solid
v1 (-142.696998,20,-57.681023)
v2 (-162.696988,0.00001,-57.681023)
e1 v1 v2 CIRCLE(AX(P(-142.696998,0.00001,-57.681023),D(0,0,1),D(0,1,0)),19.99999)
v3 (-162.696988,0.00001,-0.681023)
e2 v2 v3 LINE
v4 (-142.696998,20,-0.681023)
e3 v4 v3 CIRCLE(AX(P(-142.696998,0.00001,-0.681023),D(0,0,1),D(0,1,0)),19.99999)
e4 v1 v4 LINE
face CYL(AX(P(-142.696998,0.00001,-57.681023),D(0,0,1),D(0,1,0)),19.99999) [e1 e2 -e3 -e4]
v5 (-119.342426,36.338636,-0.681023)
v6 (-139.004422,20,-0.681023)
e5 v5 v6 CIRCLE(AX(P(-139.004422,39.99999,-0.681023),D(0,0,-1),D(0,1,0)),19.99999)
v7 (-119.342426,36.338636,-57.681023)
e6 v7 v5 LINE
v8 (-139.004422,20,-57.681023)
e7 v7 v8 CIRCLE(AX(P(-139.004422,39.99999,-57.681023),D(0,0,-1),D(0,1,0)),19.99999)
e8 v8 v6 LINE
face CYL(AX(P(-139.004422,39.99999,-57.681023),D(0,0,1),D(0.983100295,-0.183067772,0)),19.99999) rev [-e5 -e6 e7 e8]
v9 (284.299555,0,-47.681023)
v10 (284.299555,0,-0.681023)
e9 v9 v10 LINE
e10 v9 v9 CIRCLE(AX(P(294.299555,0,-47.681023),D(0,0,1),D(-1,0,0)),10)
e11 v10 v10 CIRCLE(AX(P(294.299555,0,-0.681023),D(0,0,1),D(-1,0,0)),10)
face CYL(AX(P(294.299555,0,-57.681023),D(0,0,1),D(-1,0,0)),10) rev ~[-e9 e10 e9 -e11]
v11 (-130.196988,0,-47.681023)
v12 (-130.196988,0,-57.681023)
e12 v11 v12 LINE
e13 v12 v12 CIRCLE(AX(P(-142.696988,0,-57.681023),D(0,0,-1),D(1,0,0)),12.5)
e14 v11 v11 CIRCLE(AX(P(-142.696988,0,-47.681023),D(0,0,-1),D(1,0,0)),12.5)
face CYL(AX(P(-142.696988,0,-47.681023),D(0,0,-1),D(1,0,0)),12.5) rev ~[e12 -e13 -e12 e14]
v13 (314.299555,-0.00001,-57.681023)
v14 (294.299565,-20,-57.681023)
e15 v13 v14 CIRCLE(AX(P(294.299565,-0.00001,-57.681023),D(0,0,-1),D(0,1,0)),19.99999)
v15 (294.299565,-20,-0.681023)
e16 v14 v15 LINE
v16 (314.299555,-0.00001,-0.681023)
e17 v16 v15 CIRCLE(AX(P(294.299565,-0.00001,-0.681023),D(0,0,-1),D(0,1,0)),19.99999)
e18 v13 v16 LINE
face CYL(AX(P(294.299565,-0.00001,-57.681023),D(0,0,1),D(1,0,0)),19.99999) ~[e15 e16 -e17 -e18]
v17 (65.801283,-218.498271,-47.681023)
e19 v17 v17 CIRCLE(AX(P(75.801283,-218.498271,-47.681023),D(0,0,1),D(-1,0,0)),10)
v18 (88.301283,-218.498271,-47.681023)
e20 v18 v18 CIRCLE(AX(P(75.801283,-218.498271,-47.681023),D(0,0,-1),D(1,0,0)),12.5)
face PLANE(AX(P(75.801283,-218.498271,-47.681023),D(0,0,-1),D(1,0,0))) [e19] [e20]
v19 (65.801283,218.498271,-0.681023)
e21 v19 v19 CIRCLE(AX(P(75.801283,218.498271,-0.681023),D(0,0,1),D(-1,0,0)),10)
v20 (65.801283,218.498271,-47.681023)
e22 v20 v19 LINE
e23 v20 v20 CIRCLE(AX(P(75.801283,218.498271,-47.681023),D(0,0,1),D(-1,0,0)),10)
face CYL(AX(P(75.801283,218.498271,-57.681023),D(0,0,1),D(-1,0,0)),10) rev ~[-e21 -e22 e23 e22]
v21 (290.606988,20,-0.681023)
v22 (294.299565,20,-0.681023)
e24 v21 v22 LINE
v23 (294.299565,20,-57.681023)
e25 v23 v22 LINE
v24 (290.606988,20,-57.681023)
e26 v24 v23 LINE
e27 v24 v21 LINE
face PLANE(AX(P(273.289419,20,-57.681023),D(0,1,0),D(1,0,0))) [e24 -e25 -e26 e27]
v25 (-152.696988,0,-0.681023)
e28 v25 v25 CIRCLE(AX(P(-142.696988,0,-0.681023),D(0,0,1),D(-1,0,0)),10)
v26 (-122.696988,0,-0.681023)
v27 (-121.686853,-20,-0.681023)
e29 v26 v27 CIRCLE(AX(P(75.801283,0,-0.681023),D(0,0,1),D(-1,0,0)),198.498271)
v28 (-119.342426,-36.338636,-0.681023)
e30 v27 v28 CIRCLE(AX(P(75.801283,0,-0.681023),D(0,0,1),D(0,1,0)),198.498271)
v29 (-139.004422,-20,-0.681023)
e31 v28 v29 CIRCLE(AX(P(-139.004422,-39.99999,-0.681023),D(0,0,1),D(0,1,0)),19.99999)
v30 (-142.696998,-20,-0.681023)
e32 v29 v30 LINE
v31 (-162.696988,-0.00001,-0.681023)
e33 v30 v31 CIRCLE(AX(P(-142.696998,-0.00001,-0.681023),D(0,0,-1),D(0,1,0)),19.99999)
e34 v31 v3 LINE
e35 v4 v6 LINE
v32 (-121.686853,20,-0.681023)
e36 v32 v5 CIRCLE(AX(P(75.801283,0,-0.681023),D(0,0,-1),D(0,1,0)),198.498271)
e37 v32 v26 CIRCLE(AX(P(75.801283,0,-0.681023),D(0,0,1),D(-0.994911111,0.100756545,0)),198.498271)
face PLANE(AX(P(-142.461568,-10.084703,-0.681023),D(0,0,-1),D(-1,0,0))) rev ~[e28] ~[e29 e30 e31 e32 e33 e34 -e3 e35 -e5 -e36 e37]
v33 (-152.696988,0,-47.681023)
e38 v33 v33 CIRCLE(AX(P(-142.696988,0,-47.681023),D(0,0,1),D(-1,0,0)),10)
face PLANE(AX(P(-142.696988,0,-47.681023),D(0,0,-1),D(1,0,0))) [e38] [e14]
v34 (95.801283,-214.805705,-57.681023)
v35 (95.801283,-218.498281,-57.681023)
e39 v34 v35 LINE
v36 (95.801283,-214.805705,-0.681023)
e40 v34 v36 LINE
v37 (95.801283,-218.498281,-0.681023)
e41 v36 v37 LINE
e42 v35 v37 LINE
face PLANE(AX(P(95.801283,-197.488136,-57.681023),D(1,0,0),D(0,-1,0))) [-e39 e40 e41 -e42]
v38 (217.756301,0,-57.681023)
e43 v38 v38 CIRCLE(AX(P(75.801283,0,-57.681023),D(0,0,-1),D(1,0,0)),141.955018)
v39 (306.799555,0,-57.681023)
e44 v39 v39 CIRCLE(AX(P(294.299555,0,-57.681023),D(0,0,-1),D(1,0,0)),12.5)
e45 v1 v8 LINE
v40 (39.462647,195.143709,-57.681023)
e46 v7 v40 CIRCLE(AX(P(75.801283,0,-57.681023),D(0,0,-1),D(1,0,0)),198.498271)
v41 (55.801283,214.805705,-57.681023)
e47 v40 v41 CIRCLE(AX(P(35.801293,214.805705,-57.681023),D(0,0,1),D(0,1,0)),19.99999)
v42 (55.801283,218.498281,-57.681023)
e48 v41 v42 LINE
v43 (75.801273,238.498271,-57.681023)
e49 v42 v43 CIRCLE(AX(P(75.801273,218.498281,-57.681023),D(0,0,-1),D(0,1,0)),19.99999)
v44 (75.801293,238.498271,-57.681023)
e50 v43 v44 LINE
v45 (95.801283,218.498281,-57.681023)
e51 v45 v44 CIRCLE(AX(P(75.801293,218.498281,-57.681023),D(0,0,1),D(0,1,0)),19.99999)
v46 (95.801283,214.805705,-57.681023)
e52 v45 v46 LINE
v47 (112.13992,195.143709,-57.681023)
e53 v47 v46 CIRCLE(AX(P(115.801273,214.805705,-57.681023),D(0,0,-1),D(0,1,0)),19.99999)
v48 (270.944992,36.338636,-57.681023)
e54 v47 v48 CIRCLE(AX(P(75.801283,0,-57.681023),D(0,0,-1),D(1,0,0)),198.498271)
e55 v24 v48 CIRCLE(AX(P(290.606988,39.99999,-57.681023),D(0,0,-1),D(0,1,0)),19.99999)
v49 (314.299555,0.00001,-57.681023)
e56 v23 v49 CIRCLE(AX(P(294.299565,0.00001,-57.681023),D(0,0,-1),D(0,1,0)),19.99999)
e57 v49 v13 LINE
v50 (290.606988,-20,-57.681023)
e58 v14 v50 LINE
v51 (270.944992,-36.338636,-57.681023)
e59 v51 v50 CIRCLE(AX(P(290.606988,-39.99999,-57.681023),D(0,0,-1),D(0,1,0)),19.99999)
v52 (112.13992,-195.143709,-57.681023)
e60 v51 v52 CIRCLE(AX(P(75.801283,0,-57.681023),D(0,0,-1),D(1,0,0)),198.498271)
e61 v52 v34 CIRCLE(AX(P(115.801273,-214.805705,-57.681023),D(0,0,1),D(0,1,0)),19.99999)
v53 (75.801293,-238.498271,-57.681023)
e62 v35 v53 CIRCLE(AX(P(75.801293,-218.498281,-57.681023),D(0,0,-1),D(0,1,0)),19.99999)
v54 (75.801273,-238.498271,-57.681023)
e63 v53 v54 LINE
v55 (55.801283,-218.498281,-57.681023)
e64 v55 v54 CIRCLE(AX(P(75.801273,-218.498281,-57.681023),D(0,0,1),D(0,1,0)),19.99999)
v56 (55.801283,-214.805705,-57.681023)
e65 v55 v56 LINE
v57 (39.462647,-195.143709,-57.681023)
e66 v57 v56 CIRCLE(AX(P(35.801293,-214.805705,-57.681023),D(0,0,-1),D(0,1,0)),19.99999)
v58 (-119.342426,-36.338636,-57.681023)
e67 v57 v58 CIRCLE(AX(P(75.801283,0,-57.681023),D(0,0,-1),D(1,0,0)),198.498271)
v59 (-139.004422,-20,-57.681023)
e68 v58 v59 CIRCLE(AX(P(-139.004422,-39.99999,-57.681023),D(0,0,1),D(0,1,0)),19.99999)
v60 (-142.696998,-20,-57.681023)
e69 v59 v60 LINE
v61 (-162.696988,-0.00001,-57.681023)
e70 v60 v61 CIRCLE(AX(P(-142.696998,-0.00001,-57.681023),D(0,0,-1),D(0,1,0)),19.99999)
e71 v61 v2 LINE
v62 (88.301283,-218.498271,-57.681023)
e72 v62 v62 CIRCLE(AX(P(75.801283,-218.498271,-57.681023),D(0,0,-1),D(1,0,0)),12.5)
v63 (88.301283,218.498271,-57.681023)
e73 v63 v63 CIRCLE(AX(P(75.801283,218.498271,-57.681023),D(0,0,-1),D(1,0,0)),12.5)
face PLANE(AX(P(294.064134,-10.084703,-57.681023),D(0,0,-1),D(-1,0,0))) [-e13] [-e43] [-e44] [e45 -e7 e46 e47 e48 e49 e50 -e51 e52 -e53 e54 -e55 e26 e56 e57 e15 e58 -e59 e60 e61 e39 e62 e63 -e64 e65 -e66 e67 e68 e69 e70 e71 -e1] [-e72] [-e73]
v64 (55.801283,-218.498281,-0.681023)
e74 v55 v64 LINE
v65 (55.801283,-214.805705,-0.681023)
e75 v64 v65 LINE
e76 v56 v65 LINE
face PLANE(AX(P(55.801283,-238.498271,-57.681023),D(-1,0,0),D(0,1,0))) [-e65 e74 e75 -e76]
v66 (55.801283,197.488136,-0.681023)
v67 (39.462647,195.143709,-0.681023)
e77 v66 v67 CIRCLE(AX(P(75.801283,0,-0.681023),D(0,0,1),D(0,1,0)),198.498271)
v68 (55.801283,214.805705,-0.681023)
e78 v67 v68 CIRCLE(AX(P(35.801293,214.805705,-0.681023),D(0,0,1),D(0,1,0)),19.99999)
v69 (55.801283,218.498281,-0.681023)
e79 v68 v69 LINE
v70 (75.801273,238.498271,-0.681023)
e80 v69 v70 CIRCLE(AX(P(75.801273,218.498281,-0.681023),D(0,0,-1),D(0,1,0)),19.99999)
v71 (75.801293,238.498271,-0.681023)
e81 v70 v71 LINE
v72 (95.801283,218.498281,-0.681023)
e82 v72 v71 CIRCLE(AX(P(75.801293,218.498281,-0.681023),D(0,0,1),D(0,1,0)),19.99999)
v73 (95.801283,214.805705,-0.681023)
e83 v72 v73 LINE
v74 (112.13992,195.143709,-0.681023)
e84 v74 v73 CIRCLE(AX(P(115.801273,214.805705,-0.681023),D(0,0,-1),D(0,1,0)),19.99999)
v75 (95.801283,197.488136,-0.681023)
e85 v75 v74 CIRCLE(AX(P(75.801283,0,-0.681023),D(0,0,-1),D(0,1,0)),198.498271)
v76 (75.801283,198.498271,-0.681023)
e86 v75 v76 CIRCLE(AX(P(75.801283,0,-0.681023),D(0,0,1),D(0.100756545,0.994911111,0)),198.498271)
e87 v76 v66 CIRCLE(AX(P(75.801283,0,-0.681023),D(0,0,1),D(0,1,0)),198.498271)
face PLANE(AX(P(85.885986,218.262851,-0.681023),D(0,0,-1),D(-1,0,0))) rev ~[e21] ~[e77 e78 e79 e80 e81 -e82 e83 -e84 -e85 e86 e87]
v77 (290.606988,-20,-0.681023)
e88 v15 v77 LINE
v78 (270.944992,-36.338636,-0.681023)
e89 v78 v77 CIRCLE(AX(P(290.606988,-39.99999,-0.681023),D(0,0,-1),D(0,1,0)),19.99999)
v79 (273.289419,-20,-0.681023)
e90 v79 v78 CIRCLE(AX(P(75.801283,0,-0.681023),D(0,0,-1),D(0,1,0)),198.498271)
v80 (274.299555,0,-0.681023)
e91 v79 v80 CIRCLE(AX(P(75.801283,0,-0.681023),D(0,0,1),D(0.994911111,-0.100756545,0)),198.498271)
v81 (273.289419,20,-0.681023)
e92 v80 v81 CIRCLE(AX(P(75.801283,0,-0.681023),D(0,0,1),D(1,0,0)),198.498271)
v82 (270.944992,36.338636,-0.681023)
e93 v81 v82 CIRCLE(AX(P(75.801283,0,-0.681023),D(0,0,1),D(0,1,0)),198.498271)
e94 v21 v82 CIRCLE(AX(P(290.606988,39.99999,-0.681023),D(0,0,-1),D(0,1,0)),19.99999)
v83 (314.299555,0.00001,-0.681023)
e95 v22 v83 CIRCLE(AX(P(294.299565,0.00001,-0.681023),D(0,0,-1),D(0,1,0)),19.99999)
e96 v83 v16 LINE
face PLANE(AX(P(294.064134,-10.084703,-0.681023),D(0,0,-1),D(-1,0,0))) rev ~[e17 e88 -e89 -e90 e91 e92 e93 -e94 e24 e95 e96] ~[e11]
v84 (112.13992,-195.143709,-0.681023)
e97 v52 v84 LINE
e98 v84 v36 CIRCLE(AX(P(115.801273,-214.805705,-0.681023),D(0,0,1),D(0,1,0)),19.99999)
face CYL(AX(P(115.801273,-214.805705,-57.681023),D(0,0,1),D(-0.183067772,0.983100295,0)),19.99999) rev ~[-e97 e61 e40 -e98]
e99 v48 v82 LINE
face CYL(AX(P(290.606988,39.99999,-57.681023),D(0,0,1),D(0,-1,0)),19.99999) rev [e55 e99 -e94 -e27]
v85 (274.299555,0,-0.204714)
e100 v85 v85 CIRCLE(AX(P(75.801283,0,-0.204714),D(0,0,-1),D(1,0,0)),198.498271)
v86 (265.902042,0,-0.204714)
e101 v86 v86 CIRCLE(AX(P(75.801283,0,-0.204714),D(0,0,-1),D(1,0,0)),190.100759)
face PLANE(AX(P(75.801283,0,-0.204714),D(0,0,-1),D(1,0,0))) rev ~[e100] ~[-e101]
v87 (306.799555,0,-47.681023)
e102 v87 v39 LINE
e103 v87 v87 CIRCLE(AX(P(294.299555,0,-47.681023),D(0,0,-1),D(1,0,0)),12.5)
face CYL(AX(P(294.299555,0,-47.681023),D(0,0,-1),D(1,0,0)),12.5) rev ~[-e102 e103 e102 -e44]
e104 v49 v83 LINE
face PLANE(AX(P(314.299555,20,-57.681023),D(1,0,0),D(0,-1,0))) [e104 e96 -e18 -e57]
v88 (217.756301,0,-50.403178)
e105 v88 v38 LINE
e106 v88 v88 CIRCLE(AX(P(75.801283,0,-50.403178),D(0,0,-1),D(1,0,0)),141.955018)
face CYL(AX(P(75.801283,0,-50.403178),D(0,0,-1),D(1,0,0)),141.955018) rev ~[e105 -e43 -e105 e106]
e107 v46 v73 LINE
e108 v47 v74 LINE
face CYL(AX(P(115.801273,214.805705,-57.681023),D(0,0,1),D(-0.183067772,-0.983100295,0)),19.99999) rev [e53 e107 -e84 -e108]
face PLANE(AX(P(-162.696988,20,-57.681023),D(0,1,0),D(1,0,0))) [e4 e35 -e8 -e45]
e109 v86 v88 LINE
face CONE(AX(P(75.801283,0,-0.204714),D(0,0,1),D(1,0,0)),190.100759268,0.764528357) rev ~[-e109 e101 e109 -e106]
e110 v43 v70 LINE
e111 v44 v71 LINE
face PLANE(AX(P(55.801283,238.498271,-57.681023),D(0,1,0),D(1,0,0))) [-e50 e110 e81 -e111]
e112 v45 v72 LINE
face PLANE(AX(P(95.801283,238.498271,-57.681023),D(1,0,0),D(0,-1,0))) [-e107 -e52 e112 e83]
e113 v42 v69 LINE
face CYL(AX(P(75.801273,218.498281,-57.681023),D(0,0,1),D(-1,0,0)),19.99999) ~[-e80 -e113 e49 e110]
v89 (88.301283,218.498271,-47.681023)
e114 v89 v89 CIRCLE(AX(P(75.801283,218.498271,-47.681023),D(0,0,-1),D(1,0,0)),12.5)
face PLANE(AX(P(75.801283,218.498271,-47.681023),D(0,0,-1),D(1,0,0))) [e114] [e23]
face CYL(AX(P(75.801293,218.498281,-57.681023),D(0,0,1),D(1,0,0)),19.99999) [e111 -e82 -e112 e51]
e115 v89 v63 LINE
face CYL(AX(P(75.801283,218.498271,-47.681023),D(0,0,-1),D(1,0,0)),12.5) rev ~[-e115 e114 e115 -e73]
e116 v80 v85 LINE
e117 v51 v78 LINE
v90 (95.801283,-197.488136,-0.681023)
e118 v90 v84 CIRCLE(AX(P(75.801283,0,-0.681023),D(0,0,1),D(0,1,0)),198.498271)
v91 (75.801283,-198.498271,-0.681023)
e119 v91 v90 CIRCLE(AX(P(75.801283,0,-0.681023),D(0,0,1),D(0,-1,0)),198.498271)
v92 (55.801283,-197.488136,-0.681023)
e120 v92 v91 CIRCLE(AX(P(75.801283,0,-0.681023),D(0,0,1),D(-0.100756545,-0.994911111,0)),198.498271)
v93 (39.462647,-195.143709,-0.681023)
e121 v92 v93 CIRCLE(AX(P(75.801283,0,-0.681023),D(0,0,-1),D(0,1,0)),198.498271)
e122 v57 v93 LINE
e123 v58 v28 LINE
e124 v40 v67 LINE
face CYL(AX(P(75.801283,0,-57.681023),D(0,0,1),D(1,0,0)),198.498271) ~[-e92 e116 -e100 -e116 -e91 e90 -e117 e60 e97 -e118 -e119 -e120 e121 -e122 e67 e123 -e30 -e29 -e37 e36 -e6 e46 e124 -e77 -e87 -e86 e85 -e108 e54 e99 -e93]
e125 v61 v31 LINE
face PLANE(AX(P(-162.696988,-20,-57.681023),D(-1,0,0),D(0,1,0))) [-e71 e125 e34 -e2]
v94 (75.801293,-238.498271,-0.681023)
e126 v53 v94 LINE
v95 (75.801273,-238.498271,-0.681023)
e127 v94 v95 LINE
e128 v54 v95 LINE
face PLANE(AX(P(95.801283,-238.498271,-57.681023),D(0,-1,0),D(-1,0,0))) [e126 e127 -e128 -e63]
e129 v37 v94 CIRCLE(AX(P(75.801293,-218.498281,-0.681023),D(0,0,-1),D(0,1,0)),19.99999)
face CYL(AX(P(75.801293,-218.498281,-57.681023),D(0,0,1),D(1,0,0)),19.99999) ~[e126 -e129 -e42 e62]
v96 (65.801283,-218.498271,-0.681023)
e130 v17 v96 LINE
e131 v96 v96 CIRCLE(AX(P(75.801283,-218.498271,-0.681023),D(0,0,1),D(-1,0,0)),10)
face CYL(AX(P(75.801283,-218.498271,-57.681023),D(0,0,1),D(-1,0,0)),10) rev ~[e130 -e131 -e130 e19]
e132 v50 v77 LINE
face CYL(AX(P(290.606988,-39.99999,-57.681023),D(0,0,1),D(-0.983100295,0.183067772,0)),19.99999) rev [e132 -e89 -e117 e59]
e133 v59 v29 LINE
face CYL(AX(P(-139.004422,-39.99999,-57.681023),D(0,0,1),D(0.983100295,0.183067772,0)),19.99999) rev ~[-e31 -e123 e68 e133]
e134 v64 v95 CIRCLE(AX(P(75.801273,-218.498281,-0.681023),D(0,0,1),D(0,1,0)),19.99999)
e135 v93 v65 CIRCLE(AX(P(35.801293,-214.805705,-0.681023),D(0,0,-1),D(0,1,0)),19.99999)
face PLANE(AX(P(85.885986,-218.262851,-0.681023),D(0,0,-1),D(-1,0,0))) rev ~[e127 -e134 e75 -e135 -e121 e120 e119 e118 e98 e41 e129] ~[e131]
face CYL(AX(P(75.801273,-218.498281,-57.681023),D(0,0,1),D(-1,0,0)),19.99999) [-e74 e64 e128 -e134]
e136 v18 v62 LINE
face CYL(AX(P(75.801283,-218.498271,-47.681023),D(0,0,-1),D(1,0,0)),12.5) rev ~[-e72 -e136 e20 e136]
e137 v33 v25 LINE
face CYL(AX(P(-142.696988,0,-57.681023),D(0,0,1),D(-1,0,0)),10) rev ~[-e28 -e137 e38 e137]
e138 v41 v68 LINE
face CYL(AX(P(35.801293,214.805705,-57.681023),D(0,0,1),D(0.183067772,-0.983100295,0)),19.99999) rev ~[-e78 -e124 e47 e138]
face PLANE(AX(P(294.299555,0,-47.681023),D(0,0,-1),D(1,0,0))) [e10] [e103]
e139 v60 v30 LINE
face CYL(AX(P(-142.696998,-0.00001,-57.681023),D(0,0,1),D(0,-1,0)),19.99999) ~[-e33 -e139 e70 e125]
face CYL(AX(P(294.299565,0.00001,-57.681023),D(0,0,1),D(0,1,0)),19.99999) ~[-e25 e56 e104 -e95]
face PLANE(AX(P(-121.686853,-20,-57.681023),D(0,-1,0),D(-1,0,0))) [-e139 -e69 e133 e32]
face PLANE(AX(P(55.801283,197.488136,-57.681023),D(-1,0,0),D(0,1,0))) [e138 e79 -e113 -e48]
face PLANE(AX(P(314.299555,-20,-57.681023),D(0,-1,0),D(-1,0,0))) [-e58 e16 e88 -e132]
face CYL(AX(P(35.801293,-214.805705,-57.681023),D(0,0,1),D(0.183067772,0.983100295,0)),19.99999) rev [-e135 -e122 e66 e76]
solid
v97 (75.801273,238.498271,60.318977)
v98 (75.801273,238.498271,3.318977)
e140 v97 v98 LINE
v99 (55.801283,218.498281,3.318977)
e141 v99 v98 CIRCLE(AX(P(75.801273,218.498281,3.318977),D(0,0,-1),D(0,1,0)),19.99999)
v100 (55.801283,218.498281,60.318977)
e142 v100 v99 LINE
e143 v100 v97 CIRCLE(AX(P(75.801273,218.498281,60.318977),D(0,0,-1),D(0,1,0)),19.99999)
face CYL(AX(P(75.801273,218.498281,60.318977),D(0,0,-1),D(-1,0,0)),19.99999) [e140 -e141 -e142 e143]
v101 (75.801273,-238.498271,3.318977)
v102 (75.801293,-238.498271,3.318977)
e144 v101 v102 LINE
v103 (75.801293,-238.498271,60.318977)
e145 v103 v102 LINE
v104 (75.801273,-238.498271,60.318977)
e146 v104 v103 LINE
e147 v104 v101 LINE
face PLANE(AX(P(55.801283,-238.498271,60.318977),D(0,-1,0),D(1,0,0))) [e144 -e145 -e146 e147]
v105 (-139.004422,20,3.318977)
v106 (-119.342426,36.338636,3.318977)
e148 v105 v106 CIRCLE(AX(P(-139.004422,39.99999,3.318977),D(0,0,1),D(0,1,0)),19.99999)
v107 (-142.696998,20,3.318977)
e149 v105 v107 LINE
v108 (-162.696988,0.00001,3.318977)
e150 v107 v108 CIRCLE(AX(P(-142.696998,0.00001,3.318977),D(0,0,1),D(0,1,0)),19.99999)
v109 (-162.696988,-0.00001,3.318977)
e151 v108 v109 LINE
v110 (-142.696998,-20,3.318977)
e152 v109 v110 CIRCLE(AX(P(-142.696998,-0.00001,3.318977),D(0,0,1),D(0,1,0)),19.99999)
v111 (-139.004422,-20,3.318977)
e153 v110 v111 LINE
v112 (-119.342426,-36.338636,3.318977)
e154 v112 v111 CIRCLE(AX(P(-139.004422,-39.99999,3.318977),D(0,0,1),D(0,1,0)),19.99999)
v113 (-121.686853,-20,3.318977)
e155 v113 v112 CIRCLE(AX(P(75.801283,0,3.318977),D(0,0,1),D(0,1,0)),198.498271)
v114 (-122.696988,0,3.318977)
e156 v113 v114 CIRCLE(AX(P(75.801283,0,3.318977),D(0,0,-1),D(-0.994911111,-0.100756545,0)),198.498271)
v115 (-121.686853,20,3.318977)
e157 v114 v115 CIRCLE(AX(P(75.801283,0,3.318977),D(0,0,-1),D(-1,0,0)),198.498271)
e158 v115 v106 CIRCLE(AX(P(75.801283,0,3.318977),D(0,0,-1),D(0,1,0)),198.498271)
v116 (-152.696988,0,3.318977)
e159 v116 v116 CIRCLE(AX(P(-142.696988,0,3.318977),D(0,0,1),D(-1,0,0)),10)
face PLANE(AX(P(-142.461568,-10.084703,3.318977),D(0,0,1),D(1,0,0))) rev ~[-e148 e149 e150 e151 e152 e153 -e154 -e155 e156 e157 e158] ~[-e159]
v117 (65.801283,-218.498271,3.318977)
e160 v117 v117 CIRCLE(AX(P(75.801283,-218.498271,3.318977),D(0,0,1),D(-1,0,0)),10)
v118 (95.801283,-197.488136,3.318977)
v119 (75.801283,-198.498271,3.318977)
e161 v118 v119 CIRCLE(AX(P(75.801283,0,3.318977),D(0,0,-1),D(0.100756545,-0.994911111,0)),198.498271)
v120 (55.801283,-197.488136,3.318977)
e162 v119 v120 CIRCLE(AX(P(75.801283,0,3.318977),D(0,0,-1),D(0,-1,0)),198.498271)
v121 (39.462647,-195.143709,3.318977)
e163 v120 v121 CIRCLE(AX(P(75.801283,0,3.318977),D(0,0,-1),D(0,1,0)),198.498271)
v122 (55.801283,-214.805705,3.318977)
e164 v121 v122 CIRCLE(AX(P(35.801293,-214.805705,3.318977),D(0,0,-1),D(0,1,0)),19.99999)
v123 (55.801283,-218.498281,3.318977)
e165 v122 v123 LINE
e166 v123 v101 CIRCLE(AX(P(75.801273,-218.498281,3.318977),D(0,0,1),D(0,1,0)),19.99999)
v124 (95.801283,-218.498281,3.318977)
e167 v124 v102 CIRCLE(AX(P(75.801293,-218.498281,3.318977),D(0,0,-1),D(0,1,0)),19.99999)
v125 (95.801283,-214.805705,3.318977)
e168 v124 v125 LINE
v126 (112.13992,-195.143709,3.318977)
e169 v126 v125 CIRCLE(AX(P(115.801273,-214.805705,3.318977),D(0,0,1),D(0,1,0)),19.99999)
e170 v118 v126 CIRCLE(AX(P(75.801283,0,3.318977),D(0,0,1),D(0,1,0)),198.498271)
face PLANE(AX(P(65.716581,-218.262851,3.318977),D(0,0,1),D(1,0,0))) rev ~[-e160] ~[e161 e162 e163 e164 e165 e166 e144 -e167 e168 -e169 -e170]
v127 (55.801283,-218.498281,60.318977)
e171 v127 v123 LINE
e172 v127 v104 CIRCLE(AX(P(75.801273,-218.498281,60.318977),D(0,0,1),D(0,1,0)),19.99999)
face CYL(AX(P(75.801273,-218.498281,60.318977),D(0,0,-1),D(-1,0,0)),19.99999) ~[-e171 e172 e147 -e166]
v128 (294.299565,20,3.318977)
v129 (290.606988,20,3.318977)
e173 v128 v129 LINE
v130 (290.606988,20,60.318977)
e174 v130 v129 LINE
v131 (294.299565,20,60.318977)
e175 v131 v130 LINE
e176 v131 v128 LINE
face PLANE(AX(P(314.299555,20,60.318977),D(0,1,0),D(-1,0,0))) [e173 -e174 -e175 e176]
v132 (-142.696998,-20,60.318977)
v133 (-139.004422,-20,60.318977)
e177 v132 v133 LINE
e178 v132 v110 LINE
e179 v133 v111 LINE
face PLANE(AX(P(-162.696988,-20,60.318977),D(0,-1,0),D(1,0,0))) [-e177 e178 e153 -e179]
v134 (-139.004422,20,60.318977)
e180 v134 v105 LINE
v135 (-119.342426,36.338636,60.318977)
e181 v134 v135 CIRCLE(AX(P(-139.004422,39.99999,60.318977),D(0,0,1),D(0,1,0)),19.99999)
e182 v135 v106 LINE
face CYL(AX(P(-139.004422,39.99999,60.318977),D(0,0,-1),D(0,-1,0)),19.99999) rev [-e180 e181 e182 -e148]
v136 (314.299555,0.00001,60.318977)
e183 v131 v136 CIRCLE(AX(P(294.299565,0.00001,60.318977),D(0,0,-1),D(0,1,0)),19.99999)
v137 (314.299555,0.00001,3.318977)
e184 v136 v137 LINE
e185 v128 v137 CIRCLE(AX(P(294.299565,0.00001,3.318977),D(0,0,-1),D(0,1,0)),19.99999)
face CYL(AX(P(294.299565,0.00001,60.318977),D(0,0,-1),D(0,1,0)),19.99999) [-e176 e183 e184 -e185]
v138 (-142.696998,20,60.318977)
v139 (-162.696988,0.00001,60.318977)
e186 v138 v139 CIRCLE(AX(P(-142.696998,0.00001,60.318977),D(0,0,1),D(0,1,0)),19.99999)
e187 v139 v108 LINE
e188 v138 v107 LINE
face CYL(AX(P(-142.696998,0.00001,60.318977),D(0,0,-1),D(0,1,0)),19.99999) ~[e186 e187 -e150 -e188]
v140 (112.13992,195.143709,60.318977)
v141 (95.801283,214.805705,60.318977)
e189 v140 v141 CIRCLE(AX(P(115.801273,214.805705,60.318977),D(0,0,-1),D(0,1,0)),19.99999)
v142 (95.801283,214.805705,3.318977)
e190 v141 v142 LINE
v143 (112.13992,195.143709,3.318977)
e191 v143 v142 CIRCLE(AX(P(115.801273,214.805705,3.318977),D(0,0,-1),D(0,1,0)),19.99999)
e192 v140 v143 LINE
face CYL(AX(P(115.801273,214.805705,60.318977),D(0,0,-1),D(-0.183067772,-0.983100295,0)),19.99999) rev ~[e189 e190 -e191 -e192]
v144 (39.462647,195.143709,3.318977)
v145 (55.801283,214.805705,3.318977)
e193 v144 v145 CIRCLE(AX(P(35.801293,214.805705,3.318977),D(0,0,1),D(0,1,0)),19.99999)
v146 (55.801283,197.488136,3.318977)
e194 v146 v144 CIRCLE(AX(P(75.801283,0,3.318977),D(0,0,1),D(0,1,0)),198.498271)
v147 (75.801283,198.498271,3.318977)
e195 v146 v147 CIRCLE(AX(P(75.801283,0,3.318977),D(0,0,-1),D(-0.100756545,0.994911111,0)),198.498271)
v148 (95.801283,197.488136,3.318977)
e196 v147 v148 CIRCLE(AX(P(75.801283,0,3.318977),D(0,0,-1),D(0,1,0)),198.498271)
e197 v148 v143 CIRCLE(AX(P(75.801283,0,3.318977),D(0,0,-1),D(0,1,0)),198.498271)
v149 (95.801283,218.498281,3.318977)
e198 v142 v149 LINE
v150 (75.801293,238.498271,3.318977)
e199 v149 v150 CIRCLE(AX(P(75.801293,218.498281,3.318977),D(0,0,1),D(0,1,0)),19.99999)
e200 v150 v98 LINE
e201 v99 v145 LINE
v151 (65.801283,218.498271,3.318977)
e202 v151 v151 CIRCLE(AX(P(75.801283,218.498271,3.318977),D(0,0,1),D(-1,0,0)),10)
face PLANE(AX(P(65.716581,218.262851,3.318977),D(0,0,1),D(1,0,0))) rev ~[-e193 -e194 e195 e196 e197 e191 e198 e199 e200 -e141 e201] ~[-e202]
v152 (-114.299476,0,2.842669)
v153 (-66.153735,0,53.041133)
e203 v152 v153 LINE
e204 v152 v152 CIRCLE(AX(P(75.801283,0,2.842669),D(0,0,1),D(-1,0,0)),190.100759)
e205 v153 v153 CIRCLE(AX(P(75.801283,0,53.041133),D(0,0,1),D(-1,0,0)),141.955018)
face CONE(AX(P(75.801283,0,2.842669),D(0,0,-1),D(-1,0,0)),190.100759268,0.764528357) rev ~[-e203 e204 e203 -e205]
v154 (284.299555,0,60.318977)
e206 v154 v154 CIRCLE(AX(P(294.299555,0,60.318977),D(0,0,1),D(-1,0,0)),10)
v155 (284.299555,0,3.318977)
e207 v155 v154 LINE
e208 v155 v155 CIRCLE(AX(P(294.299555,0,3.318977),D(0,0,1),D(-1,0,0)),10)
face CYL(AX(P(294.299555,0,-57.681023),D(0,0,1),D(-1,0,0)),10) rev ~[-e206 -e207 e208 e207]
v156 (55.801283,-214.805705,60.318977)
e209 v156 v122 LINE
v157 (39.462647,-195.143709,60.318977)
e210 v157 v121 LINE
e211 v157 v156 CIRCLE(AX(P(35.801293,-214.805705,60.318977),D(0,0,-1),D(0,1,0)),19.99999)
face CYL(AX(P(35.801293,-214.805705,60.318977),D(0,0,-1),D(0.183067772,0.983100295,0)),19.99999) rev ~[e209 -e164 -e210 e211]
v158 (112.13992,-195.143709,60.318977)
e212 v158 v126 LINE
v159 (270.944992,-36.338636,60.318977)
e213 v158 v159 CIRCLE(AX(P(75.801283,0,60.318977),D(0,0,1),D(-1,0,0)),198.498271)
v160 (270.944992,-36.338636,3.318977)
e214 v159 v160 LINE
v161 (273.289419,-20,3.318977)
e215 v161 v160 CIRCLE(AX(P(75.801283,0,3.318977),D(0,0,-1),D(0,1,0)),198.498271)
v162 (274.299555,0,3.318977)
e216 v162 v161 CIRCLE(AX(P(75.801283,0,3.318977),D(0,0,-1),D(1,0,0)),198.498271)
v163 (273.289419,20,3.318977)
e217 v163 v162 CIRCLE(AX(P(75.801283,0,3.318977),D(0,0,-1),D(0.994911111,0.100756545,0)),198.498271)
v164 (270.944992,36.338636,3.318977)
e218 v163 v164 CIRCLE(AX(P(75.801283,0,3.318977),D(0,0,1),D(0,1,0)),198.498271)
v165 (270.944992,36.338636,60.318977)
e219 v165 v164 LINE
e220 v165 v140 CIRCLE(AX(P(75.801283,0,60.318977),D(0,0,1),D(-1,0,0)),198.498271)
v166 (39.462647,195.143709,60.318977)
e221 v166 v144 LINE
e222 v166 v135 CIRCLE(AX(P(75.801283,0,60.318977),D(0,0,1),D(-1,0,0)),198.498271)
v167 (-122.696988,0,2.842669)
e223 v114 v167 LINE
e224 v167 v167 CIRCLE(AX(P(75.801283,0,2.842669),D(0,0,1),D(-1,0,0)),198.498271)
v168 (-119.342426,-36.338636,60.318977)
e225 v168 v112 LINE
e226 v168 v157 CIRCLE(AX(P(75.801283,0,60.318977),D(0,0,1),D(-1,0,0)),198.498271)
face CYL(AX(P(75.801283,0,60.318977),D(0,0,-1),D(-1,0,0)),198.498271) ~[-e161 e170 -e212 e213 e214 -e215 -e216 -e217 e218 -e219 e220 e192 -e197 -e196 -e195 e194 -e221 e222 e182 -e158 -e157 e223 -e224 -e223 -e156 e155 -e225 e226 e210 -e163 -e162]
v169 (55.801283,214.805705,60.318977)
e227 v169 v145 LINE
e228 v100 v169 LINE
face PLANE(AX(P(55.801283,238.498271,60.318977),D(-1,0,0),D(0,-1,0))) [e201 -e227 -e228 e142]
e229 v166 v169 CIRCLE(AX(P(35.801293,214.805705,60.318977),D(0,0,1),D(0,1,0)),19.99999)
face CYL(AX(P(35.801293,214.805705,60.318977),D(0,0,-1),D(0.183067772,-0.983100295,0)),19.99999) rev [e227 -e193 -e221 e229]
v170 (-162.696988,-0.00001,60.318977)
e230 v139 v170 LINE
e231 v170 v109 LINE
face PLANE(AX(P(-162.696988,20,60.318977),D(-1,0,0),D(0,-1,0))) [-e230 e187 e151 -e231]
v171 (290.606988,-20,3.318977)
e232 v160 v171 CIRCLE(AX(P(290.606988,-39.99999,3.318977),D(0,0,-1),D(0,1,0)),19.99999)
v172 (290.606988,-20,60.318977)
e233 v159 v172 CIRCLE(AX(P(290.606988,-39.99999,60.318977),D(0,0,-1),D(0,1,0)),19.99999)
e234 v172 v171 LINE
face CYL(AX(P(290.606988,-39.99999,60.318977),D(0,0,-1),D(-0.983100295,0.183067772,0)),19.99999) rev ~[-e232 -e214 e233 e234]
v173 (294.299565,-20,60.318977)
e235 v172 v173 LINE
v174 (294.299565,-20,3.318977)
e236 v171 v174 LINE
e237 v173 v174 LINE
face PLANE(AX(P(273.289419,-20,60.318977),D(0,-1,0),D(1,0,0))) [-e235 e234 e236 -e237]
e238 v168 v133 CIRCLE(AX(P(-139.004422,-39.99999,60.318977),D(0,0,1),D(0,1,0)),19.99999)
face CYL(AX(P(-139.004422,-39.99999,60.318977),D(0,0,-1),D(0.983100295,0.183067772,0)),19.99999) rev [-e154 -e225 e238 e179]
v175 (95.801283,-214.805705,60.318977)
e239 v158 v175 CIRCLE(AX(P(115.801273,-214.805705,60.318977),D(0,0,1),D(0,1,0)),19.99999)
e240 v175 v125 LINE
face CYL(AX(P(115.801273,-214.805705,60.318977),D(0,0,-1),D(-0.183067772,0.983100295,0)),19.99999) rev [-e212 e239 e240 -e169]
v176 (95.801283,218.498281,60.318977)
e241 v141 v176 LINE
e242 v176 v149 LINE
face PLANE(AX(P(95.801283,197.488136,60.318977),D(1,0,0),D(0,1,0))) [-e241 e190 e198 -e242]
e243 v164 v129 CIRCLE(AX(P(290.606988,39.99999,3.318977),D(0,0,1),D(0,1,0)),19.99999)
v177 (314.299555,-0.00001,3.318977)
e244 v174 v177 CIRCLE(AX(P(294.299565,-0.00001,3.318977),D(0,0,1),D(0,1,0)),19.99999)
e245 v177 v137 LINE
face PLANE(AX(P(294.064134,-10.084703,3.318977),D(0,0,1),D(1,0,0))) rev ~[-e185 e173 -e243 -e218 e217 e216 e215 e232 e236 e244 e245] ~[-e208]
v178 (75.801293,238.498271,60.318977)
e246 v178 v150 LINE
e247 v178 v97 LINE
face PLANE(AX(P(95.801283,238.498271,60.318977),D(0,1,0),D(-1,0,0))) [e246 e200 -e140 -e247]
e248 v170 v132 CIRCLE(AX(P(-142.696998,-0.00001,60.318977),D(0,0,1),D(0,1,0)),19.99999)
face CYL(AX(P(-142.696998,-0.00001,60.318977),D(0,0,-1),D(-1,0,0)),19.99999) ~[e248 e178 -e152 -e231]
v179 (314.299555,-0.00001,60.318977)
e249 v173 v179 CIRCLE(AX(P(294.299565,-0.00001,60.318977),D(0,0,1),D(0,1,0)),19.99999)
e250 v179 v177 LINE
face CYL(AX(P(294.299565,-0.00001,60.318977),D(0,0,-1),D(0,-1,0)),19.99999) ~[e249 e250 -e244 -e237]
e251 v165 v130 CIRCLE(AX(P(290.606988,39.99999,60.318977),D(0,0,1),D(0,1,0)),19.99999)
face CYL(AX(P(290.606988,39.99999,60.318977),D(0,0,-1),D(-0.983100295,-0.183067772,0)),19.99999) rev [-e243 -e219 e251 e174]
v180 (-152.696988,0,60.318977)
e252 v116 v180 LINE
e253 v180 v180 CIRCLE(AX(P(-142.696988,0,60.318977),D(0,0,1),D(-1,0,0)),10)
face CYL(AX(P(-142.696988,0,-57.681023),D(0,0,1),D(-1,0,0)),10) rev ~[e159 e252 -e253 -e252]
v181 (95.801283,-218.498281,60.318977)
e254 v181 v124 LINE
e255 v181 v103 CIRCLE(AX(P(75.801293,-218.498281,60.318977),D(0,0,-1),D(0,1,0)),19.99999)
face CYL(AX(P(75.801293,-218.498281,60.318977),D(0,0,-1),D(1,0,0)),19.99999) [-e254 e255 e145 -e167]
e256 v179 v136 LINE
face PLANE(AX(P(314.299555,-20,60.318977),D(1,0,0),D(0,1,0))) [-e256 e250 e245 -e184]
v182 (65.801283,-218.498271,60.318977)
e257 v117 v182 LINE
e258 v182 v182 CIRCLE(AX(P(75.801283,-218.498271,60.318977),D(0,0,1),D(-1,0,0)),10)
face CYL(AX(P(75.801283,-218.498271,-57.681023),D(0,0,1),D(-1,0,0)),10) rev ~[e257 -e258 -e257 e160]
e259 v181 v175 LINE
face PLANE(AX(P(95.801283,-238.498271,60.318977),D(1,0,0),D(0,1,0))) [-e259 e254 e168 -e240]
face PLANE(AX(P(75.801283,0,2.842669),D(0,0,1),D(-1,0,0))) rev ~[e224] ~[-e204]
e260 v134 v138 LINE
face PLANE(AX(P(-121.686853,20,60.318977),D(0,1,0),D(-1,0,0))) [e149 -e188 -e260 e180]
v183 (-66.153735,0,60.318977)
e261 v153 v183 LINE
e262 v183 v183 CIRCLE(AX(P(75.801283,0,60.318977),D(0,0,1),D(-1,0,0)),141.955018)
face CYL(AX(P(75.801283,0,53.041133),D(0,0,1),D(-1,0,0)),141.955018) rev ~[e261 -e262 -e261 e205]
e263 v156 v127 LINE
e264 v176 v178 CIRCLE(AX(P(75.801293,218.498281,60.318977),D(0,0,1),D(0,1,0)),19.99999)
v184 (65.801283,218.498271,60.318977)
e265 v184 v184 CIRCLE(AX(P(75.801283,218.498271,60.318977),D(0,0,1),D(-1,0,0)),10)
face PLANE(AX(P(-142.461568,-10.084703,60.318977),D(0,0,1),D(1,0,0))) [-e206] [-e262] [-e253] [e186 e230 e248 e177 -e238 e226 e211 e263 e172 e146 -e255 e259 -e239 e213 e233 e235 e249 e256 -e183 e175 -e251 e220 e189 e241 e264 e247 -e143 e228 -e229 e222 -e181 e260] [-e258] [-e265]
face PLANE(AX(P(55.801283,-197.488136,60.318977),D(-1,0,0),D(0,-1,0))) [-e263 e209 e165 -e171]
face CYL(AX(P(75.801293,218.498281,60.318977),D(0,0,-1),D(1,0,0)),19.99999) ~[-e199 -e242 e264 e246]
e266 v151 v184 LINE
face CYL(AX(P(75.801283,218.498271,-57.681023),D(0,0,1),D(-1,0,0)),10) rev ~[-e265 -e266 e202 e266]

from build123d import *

# Parameters (mm, degrees)
F3_DEPTH          = 57
F4_R              = 19.99999
F7_ANGLE          = 180
F10_D             = 20
F10_CBORE_D       = 25
F10_CBORE_DEPTH   = 10
F10_2_D           = 20
F10_2_CBORE_D     = 25
F10_2_CBORE_DEPTH = 10


# Not quite as in the source:
# - a fillet or chamfer is up to 0.001 mm smaller than in the source, because OpenCascade refuses the exact size


with BuildPart() as f1:
    # F0 (on Front) → F1 (revolve)
    with BuildSketch(Plane.XZ):
        Polygon((-122.6969882846, 61.8426688015), (-114.2994761467, 61.8426688015), (-66.1537349224, 112.0411325246), (-66.1537349224, 119.318977464), (-122.6969882846, 119.318977464), align=None)
    revolve(axis=Axis((75.8012831211, 0, 61.6655610502), (0, 0, 1)))

    # F2 (on face) → F3 (join)
    with BuildSketch(Plane.XY.offset(119.318977464)):
        with BuildLine():
            ThreePointArc((-121.6868526011, -20), (-122.4442935194, -10.0127465525), (-122.6969882846, 0))
            Line((-122.6969882846, 0), (-162.6969882846, 0))
            Line((-162.6969882846, 0), (-162.6969882846, -20))
            Line((-162.6969882846, -20), (-121.6868526011, -20))
        make_face()
        with BuildLine():
            Line((-162.6969882846, 0), (-122.6969882846, 0))
            ThreePointArc((-122.6969882846, 0), (-122.4442935194, 10.0127465525), (-121.6868526011, 20))
            Line((-121.6868526011, 20), (-162.6969882846, 20))
            Line((-162.6969882846, 20), (-162.6969882846, 0))
        make_face()
        with BuildLine():
            ThreePointArc((55.8012831211, 197.4881357222), (65.7885365686, 198.2455766405), (75.8012831211, 198.4982714057))
            Line((75.8012831211, 198.4982714057), (75.8012831211, 238.4982714057))
            Line((75.8012831211, 238.4982714057), (55.8012831211, 238.4982714057))
            Line((55.8012831211, 238.4982714057), (55.8012831211, 197.4881357223))
        make_face()
        with BuildLine():
            Line((75.8012831211, 238.4982714057), (75.8012831211, 198.4982714057))
            ThreePointArc((75.8012831211, 198.4982714057), (85.8140296736, 198.2455766405), (95.8012831211, 197.4881357222))
            Line((95.8012831211, 197.4881357222), (95.8012831211, 238.4982714057))
            Line((95.8012831211, 238.4982714057), (75.8012831211, 238.4982714057))
        make_face()
        with BuildLine():
            Line((75.8012831211, -238.4982714057), (75.8012831211, -198.4982714057))
            ThreePointArc((75.8012831211, -198.4982714057), (65.7885365686, -198.2455766405), (55.8012831211, -197.4881357222))
            Line((55.8012831211, -197.4881357222), (55.8012831211, -238.4982714057))
            Line((55.8012831211, -238.4982714057), (75.8012831211, -238.4982714057))
        make_face()
        with BuildLine():
            ThreePointArc((95.8012831211, -197.4881357223), (85.8140296736, -198.2455766405), (75.8012831211, -198.4982714057))
            Line((75.8012831211, -198.4982714057), (75.8012831211, -238.4982714057))
            Line((75.8012831211, -238.4982714057), (95.8012831211, -238.4982714057))
            Line((95.8012831211, -238.4982714057), (95.8012831211, -197.4881357223))
        make_face()
        with BuildLine():
            Line((314.2995545268, 0), (274.2995545268, 0))
            ThreePointArc((274.2995545268, 0), (274.0468597616, -10.0127465525), (273.2894188434, -20))
            Line((273.2894188434, -20), (314.2995545268, -20))
            Line((314.2995545268, -20), (314.2995545268, 0))
        make_face()
        with BuildLine():
            ThreePointArc((273.2894188434, 20), (274.0468597616, 10.0127465525), (274.2995545268, 0))
            Line((274.2995545268, 0), (314.2995545268, 0))
            Line((314.2995545268, 0), (314.2995545268, 20))
            Line((314.2995545268, 20), (273.2894188434, 20))
        make_face()
    extrude(amount=-F3_DEPTH)

    # F4 (radius 20 in the source; OpenCascade refuses exactly that, so slightly less here)
    f4_edges = [f1.edges().sort_by_distance(p)[0] for p in [
        (95.801283, -197.488136, 90.818977),
        (55.801283, -197.488136, 90.818977),
        (273.289419, -20, 90.818977),
        (-121.686853, 20, 90.818977),
        (95.801283, 197.488136, 90.818977),
        (55.801283, 197.488136, 90.818977),
        (273.289419, 20, 90.818977),
        (-121.686853, -20, 90.818977),
        (-162.696988, -20, 90.818977),
        (-162.696988, 20, 90.818977),
        (55.801283, 238.498271, 90.818977),
        (95.801283, 238.498271, 90.818977),
        (314.299555, 20, 90.818977),
        (314.299555, -20, 90.818977),
        (95.801283, -238.498271, 90.818977),
        (55.801283, -238.498271, 90.818977),
    ]]
    fillet(f4_edges, radius=F4_R)


with BuildPart() as f1b:
    # F0 (on Front) → F1, piece 2 (revolve)
    with BuildSketch(Plane.XZ):
        Polygon((-114.2994761467, 61.4884532988), (-122.6969882846, 61.4884532988), (-122.6969882846, 4.0121446364), (-66.1537349224, 4.0121446364), (-66.1537349224, 11.2899895757), align=None)
    revolve(axis=Axis((75.8012831211, 0, 61.6655610502), (0, 0, 1)))


with BuildPart() as f6_1:
    # F6: copy of F1
    add(f1.part.moved(Location((0, 0, -59))))

    # F10#2 (through all)
    with Locations(Plane(origin=(0, 0, -57.681022536), x_dir=(1, 0, 0), z_dir=(0, 0, -1))):
        with Locations((75.8012831211, 218.4982714057), (-142.6969882846, 0), (75.8012831211, -218.4982714057), (294.2995545268, 0)):
            CounterBoreHole(F10_2_D / 2, F10_2_CBORE_D / 2, F10_2_CBORE_DEPTH)


with BuildPart() as f1_1:
    # F7: moved
    add(f1.part.rotate(Axis((75.8012831211, 0, 119.318977464), (0, -1, 0)), F7_ANGLE))


with BuildPart() as f1_2:
    # F8: moved
    add(f1_1.part.moved(Location((0, 0, -177))))

    # F10 (through all)
    with Locations(Plane(origin=(0, 0, -57.681022536), x_dir=(1, 0, 0), z_dir=(0, 0, -1))):
        with Locations((75.8012831211, 218.4982714057), (-142.6969882846, 0), (75.8012831211, -218.4982714057), (294.2995545268, 0)):
            CounterBoreHole(F10_D / 2, F10_CBORE_D / 2, F10_CBORE_DEPTH)


solid = Compound([f6_1.part, f1_2.part])
